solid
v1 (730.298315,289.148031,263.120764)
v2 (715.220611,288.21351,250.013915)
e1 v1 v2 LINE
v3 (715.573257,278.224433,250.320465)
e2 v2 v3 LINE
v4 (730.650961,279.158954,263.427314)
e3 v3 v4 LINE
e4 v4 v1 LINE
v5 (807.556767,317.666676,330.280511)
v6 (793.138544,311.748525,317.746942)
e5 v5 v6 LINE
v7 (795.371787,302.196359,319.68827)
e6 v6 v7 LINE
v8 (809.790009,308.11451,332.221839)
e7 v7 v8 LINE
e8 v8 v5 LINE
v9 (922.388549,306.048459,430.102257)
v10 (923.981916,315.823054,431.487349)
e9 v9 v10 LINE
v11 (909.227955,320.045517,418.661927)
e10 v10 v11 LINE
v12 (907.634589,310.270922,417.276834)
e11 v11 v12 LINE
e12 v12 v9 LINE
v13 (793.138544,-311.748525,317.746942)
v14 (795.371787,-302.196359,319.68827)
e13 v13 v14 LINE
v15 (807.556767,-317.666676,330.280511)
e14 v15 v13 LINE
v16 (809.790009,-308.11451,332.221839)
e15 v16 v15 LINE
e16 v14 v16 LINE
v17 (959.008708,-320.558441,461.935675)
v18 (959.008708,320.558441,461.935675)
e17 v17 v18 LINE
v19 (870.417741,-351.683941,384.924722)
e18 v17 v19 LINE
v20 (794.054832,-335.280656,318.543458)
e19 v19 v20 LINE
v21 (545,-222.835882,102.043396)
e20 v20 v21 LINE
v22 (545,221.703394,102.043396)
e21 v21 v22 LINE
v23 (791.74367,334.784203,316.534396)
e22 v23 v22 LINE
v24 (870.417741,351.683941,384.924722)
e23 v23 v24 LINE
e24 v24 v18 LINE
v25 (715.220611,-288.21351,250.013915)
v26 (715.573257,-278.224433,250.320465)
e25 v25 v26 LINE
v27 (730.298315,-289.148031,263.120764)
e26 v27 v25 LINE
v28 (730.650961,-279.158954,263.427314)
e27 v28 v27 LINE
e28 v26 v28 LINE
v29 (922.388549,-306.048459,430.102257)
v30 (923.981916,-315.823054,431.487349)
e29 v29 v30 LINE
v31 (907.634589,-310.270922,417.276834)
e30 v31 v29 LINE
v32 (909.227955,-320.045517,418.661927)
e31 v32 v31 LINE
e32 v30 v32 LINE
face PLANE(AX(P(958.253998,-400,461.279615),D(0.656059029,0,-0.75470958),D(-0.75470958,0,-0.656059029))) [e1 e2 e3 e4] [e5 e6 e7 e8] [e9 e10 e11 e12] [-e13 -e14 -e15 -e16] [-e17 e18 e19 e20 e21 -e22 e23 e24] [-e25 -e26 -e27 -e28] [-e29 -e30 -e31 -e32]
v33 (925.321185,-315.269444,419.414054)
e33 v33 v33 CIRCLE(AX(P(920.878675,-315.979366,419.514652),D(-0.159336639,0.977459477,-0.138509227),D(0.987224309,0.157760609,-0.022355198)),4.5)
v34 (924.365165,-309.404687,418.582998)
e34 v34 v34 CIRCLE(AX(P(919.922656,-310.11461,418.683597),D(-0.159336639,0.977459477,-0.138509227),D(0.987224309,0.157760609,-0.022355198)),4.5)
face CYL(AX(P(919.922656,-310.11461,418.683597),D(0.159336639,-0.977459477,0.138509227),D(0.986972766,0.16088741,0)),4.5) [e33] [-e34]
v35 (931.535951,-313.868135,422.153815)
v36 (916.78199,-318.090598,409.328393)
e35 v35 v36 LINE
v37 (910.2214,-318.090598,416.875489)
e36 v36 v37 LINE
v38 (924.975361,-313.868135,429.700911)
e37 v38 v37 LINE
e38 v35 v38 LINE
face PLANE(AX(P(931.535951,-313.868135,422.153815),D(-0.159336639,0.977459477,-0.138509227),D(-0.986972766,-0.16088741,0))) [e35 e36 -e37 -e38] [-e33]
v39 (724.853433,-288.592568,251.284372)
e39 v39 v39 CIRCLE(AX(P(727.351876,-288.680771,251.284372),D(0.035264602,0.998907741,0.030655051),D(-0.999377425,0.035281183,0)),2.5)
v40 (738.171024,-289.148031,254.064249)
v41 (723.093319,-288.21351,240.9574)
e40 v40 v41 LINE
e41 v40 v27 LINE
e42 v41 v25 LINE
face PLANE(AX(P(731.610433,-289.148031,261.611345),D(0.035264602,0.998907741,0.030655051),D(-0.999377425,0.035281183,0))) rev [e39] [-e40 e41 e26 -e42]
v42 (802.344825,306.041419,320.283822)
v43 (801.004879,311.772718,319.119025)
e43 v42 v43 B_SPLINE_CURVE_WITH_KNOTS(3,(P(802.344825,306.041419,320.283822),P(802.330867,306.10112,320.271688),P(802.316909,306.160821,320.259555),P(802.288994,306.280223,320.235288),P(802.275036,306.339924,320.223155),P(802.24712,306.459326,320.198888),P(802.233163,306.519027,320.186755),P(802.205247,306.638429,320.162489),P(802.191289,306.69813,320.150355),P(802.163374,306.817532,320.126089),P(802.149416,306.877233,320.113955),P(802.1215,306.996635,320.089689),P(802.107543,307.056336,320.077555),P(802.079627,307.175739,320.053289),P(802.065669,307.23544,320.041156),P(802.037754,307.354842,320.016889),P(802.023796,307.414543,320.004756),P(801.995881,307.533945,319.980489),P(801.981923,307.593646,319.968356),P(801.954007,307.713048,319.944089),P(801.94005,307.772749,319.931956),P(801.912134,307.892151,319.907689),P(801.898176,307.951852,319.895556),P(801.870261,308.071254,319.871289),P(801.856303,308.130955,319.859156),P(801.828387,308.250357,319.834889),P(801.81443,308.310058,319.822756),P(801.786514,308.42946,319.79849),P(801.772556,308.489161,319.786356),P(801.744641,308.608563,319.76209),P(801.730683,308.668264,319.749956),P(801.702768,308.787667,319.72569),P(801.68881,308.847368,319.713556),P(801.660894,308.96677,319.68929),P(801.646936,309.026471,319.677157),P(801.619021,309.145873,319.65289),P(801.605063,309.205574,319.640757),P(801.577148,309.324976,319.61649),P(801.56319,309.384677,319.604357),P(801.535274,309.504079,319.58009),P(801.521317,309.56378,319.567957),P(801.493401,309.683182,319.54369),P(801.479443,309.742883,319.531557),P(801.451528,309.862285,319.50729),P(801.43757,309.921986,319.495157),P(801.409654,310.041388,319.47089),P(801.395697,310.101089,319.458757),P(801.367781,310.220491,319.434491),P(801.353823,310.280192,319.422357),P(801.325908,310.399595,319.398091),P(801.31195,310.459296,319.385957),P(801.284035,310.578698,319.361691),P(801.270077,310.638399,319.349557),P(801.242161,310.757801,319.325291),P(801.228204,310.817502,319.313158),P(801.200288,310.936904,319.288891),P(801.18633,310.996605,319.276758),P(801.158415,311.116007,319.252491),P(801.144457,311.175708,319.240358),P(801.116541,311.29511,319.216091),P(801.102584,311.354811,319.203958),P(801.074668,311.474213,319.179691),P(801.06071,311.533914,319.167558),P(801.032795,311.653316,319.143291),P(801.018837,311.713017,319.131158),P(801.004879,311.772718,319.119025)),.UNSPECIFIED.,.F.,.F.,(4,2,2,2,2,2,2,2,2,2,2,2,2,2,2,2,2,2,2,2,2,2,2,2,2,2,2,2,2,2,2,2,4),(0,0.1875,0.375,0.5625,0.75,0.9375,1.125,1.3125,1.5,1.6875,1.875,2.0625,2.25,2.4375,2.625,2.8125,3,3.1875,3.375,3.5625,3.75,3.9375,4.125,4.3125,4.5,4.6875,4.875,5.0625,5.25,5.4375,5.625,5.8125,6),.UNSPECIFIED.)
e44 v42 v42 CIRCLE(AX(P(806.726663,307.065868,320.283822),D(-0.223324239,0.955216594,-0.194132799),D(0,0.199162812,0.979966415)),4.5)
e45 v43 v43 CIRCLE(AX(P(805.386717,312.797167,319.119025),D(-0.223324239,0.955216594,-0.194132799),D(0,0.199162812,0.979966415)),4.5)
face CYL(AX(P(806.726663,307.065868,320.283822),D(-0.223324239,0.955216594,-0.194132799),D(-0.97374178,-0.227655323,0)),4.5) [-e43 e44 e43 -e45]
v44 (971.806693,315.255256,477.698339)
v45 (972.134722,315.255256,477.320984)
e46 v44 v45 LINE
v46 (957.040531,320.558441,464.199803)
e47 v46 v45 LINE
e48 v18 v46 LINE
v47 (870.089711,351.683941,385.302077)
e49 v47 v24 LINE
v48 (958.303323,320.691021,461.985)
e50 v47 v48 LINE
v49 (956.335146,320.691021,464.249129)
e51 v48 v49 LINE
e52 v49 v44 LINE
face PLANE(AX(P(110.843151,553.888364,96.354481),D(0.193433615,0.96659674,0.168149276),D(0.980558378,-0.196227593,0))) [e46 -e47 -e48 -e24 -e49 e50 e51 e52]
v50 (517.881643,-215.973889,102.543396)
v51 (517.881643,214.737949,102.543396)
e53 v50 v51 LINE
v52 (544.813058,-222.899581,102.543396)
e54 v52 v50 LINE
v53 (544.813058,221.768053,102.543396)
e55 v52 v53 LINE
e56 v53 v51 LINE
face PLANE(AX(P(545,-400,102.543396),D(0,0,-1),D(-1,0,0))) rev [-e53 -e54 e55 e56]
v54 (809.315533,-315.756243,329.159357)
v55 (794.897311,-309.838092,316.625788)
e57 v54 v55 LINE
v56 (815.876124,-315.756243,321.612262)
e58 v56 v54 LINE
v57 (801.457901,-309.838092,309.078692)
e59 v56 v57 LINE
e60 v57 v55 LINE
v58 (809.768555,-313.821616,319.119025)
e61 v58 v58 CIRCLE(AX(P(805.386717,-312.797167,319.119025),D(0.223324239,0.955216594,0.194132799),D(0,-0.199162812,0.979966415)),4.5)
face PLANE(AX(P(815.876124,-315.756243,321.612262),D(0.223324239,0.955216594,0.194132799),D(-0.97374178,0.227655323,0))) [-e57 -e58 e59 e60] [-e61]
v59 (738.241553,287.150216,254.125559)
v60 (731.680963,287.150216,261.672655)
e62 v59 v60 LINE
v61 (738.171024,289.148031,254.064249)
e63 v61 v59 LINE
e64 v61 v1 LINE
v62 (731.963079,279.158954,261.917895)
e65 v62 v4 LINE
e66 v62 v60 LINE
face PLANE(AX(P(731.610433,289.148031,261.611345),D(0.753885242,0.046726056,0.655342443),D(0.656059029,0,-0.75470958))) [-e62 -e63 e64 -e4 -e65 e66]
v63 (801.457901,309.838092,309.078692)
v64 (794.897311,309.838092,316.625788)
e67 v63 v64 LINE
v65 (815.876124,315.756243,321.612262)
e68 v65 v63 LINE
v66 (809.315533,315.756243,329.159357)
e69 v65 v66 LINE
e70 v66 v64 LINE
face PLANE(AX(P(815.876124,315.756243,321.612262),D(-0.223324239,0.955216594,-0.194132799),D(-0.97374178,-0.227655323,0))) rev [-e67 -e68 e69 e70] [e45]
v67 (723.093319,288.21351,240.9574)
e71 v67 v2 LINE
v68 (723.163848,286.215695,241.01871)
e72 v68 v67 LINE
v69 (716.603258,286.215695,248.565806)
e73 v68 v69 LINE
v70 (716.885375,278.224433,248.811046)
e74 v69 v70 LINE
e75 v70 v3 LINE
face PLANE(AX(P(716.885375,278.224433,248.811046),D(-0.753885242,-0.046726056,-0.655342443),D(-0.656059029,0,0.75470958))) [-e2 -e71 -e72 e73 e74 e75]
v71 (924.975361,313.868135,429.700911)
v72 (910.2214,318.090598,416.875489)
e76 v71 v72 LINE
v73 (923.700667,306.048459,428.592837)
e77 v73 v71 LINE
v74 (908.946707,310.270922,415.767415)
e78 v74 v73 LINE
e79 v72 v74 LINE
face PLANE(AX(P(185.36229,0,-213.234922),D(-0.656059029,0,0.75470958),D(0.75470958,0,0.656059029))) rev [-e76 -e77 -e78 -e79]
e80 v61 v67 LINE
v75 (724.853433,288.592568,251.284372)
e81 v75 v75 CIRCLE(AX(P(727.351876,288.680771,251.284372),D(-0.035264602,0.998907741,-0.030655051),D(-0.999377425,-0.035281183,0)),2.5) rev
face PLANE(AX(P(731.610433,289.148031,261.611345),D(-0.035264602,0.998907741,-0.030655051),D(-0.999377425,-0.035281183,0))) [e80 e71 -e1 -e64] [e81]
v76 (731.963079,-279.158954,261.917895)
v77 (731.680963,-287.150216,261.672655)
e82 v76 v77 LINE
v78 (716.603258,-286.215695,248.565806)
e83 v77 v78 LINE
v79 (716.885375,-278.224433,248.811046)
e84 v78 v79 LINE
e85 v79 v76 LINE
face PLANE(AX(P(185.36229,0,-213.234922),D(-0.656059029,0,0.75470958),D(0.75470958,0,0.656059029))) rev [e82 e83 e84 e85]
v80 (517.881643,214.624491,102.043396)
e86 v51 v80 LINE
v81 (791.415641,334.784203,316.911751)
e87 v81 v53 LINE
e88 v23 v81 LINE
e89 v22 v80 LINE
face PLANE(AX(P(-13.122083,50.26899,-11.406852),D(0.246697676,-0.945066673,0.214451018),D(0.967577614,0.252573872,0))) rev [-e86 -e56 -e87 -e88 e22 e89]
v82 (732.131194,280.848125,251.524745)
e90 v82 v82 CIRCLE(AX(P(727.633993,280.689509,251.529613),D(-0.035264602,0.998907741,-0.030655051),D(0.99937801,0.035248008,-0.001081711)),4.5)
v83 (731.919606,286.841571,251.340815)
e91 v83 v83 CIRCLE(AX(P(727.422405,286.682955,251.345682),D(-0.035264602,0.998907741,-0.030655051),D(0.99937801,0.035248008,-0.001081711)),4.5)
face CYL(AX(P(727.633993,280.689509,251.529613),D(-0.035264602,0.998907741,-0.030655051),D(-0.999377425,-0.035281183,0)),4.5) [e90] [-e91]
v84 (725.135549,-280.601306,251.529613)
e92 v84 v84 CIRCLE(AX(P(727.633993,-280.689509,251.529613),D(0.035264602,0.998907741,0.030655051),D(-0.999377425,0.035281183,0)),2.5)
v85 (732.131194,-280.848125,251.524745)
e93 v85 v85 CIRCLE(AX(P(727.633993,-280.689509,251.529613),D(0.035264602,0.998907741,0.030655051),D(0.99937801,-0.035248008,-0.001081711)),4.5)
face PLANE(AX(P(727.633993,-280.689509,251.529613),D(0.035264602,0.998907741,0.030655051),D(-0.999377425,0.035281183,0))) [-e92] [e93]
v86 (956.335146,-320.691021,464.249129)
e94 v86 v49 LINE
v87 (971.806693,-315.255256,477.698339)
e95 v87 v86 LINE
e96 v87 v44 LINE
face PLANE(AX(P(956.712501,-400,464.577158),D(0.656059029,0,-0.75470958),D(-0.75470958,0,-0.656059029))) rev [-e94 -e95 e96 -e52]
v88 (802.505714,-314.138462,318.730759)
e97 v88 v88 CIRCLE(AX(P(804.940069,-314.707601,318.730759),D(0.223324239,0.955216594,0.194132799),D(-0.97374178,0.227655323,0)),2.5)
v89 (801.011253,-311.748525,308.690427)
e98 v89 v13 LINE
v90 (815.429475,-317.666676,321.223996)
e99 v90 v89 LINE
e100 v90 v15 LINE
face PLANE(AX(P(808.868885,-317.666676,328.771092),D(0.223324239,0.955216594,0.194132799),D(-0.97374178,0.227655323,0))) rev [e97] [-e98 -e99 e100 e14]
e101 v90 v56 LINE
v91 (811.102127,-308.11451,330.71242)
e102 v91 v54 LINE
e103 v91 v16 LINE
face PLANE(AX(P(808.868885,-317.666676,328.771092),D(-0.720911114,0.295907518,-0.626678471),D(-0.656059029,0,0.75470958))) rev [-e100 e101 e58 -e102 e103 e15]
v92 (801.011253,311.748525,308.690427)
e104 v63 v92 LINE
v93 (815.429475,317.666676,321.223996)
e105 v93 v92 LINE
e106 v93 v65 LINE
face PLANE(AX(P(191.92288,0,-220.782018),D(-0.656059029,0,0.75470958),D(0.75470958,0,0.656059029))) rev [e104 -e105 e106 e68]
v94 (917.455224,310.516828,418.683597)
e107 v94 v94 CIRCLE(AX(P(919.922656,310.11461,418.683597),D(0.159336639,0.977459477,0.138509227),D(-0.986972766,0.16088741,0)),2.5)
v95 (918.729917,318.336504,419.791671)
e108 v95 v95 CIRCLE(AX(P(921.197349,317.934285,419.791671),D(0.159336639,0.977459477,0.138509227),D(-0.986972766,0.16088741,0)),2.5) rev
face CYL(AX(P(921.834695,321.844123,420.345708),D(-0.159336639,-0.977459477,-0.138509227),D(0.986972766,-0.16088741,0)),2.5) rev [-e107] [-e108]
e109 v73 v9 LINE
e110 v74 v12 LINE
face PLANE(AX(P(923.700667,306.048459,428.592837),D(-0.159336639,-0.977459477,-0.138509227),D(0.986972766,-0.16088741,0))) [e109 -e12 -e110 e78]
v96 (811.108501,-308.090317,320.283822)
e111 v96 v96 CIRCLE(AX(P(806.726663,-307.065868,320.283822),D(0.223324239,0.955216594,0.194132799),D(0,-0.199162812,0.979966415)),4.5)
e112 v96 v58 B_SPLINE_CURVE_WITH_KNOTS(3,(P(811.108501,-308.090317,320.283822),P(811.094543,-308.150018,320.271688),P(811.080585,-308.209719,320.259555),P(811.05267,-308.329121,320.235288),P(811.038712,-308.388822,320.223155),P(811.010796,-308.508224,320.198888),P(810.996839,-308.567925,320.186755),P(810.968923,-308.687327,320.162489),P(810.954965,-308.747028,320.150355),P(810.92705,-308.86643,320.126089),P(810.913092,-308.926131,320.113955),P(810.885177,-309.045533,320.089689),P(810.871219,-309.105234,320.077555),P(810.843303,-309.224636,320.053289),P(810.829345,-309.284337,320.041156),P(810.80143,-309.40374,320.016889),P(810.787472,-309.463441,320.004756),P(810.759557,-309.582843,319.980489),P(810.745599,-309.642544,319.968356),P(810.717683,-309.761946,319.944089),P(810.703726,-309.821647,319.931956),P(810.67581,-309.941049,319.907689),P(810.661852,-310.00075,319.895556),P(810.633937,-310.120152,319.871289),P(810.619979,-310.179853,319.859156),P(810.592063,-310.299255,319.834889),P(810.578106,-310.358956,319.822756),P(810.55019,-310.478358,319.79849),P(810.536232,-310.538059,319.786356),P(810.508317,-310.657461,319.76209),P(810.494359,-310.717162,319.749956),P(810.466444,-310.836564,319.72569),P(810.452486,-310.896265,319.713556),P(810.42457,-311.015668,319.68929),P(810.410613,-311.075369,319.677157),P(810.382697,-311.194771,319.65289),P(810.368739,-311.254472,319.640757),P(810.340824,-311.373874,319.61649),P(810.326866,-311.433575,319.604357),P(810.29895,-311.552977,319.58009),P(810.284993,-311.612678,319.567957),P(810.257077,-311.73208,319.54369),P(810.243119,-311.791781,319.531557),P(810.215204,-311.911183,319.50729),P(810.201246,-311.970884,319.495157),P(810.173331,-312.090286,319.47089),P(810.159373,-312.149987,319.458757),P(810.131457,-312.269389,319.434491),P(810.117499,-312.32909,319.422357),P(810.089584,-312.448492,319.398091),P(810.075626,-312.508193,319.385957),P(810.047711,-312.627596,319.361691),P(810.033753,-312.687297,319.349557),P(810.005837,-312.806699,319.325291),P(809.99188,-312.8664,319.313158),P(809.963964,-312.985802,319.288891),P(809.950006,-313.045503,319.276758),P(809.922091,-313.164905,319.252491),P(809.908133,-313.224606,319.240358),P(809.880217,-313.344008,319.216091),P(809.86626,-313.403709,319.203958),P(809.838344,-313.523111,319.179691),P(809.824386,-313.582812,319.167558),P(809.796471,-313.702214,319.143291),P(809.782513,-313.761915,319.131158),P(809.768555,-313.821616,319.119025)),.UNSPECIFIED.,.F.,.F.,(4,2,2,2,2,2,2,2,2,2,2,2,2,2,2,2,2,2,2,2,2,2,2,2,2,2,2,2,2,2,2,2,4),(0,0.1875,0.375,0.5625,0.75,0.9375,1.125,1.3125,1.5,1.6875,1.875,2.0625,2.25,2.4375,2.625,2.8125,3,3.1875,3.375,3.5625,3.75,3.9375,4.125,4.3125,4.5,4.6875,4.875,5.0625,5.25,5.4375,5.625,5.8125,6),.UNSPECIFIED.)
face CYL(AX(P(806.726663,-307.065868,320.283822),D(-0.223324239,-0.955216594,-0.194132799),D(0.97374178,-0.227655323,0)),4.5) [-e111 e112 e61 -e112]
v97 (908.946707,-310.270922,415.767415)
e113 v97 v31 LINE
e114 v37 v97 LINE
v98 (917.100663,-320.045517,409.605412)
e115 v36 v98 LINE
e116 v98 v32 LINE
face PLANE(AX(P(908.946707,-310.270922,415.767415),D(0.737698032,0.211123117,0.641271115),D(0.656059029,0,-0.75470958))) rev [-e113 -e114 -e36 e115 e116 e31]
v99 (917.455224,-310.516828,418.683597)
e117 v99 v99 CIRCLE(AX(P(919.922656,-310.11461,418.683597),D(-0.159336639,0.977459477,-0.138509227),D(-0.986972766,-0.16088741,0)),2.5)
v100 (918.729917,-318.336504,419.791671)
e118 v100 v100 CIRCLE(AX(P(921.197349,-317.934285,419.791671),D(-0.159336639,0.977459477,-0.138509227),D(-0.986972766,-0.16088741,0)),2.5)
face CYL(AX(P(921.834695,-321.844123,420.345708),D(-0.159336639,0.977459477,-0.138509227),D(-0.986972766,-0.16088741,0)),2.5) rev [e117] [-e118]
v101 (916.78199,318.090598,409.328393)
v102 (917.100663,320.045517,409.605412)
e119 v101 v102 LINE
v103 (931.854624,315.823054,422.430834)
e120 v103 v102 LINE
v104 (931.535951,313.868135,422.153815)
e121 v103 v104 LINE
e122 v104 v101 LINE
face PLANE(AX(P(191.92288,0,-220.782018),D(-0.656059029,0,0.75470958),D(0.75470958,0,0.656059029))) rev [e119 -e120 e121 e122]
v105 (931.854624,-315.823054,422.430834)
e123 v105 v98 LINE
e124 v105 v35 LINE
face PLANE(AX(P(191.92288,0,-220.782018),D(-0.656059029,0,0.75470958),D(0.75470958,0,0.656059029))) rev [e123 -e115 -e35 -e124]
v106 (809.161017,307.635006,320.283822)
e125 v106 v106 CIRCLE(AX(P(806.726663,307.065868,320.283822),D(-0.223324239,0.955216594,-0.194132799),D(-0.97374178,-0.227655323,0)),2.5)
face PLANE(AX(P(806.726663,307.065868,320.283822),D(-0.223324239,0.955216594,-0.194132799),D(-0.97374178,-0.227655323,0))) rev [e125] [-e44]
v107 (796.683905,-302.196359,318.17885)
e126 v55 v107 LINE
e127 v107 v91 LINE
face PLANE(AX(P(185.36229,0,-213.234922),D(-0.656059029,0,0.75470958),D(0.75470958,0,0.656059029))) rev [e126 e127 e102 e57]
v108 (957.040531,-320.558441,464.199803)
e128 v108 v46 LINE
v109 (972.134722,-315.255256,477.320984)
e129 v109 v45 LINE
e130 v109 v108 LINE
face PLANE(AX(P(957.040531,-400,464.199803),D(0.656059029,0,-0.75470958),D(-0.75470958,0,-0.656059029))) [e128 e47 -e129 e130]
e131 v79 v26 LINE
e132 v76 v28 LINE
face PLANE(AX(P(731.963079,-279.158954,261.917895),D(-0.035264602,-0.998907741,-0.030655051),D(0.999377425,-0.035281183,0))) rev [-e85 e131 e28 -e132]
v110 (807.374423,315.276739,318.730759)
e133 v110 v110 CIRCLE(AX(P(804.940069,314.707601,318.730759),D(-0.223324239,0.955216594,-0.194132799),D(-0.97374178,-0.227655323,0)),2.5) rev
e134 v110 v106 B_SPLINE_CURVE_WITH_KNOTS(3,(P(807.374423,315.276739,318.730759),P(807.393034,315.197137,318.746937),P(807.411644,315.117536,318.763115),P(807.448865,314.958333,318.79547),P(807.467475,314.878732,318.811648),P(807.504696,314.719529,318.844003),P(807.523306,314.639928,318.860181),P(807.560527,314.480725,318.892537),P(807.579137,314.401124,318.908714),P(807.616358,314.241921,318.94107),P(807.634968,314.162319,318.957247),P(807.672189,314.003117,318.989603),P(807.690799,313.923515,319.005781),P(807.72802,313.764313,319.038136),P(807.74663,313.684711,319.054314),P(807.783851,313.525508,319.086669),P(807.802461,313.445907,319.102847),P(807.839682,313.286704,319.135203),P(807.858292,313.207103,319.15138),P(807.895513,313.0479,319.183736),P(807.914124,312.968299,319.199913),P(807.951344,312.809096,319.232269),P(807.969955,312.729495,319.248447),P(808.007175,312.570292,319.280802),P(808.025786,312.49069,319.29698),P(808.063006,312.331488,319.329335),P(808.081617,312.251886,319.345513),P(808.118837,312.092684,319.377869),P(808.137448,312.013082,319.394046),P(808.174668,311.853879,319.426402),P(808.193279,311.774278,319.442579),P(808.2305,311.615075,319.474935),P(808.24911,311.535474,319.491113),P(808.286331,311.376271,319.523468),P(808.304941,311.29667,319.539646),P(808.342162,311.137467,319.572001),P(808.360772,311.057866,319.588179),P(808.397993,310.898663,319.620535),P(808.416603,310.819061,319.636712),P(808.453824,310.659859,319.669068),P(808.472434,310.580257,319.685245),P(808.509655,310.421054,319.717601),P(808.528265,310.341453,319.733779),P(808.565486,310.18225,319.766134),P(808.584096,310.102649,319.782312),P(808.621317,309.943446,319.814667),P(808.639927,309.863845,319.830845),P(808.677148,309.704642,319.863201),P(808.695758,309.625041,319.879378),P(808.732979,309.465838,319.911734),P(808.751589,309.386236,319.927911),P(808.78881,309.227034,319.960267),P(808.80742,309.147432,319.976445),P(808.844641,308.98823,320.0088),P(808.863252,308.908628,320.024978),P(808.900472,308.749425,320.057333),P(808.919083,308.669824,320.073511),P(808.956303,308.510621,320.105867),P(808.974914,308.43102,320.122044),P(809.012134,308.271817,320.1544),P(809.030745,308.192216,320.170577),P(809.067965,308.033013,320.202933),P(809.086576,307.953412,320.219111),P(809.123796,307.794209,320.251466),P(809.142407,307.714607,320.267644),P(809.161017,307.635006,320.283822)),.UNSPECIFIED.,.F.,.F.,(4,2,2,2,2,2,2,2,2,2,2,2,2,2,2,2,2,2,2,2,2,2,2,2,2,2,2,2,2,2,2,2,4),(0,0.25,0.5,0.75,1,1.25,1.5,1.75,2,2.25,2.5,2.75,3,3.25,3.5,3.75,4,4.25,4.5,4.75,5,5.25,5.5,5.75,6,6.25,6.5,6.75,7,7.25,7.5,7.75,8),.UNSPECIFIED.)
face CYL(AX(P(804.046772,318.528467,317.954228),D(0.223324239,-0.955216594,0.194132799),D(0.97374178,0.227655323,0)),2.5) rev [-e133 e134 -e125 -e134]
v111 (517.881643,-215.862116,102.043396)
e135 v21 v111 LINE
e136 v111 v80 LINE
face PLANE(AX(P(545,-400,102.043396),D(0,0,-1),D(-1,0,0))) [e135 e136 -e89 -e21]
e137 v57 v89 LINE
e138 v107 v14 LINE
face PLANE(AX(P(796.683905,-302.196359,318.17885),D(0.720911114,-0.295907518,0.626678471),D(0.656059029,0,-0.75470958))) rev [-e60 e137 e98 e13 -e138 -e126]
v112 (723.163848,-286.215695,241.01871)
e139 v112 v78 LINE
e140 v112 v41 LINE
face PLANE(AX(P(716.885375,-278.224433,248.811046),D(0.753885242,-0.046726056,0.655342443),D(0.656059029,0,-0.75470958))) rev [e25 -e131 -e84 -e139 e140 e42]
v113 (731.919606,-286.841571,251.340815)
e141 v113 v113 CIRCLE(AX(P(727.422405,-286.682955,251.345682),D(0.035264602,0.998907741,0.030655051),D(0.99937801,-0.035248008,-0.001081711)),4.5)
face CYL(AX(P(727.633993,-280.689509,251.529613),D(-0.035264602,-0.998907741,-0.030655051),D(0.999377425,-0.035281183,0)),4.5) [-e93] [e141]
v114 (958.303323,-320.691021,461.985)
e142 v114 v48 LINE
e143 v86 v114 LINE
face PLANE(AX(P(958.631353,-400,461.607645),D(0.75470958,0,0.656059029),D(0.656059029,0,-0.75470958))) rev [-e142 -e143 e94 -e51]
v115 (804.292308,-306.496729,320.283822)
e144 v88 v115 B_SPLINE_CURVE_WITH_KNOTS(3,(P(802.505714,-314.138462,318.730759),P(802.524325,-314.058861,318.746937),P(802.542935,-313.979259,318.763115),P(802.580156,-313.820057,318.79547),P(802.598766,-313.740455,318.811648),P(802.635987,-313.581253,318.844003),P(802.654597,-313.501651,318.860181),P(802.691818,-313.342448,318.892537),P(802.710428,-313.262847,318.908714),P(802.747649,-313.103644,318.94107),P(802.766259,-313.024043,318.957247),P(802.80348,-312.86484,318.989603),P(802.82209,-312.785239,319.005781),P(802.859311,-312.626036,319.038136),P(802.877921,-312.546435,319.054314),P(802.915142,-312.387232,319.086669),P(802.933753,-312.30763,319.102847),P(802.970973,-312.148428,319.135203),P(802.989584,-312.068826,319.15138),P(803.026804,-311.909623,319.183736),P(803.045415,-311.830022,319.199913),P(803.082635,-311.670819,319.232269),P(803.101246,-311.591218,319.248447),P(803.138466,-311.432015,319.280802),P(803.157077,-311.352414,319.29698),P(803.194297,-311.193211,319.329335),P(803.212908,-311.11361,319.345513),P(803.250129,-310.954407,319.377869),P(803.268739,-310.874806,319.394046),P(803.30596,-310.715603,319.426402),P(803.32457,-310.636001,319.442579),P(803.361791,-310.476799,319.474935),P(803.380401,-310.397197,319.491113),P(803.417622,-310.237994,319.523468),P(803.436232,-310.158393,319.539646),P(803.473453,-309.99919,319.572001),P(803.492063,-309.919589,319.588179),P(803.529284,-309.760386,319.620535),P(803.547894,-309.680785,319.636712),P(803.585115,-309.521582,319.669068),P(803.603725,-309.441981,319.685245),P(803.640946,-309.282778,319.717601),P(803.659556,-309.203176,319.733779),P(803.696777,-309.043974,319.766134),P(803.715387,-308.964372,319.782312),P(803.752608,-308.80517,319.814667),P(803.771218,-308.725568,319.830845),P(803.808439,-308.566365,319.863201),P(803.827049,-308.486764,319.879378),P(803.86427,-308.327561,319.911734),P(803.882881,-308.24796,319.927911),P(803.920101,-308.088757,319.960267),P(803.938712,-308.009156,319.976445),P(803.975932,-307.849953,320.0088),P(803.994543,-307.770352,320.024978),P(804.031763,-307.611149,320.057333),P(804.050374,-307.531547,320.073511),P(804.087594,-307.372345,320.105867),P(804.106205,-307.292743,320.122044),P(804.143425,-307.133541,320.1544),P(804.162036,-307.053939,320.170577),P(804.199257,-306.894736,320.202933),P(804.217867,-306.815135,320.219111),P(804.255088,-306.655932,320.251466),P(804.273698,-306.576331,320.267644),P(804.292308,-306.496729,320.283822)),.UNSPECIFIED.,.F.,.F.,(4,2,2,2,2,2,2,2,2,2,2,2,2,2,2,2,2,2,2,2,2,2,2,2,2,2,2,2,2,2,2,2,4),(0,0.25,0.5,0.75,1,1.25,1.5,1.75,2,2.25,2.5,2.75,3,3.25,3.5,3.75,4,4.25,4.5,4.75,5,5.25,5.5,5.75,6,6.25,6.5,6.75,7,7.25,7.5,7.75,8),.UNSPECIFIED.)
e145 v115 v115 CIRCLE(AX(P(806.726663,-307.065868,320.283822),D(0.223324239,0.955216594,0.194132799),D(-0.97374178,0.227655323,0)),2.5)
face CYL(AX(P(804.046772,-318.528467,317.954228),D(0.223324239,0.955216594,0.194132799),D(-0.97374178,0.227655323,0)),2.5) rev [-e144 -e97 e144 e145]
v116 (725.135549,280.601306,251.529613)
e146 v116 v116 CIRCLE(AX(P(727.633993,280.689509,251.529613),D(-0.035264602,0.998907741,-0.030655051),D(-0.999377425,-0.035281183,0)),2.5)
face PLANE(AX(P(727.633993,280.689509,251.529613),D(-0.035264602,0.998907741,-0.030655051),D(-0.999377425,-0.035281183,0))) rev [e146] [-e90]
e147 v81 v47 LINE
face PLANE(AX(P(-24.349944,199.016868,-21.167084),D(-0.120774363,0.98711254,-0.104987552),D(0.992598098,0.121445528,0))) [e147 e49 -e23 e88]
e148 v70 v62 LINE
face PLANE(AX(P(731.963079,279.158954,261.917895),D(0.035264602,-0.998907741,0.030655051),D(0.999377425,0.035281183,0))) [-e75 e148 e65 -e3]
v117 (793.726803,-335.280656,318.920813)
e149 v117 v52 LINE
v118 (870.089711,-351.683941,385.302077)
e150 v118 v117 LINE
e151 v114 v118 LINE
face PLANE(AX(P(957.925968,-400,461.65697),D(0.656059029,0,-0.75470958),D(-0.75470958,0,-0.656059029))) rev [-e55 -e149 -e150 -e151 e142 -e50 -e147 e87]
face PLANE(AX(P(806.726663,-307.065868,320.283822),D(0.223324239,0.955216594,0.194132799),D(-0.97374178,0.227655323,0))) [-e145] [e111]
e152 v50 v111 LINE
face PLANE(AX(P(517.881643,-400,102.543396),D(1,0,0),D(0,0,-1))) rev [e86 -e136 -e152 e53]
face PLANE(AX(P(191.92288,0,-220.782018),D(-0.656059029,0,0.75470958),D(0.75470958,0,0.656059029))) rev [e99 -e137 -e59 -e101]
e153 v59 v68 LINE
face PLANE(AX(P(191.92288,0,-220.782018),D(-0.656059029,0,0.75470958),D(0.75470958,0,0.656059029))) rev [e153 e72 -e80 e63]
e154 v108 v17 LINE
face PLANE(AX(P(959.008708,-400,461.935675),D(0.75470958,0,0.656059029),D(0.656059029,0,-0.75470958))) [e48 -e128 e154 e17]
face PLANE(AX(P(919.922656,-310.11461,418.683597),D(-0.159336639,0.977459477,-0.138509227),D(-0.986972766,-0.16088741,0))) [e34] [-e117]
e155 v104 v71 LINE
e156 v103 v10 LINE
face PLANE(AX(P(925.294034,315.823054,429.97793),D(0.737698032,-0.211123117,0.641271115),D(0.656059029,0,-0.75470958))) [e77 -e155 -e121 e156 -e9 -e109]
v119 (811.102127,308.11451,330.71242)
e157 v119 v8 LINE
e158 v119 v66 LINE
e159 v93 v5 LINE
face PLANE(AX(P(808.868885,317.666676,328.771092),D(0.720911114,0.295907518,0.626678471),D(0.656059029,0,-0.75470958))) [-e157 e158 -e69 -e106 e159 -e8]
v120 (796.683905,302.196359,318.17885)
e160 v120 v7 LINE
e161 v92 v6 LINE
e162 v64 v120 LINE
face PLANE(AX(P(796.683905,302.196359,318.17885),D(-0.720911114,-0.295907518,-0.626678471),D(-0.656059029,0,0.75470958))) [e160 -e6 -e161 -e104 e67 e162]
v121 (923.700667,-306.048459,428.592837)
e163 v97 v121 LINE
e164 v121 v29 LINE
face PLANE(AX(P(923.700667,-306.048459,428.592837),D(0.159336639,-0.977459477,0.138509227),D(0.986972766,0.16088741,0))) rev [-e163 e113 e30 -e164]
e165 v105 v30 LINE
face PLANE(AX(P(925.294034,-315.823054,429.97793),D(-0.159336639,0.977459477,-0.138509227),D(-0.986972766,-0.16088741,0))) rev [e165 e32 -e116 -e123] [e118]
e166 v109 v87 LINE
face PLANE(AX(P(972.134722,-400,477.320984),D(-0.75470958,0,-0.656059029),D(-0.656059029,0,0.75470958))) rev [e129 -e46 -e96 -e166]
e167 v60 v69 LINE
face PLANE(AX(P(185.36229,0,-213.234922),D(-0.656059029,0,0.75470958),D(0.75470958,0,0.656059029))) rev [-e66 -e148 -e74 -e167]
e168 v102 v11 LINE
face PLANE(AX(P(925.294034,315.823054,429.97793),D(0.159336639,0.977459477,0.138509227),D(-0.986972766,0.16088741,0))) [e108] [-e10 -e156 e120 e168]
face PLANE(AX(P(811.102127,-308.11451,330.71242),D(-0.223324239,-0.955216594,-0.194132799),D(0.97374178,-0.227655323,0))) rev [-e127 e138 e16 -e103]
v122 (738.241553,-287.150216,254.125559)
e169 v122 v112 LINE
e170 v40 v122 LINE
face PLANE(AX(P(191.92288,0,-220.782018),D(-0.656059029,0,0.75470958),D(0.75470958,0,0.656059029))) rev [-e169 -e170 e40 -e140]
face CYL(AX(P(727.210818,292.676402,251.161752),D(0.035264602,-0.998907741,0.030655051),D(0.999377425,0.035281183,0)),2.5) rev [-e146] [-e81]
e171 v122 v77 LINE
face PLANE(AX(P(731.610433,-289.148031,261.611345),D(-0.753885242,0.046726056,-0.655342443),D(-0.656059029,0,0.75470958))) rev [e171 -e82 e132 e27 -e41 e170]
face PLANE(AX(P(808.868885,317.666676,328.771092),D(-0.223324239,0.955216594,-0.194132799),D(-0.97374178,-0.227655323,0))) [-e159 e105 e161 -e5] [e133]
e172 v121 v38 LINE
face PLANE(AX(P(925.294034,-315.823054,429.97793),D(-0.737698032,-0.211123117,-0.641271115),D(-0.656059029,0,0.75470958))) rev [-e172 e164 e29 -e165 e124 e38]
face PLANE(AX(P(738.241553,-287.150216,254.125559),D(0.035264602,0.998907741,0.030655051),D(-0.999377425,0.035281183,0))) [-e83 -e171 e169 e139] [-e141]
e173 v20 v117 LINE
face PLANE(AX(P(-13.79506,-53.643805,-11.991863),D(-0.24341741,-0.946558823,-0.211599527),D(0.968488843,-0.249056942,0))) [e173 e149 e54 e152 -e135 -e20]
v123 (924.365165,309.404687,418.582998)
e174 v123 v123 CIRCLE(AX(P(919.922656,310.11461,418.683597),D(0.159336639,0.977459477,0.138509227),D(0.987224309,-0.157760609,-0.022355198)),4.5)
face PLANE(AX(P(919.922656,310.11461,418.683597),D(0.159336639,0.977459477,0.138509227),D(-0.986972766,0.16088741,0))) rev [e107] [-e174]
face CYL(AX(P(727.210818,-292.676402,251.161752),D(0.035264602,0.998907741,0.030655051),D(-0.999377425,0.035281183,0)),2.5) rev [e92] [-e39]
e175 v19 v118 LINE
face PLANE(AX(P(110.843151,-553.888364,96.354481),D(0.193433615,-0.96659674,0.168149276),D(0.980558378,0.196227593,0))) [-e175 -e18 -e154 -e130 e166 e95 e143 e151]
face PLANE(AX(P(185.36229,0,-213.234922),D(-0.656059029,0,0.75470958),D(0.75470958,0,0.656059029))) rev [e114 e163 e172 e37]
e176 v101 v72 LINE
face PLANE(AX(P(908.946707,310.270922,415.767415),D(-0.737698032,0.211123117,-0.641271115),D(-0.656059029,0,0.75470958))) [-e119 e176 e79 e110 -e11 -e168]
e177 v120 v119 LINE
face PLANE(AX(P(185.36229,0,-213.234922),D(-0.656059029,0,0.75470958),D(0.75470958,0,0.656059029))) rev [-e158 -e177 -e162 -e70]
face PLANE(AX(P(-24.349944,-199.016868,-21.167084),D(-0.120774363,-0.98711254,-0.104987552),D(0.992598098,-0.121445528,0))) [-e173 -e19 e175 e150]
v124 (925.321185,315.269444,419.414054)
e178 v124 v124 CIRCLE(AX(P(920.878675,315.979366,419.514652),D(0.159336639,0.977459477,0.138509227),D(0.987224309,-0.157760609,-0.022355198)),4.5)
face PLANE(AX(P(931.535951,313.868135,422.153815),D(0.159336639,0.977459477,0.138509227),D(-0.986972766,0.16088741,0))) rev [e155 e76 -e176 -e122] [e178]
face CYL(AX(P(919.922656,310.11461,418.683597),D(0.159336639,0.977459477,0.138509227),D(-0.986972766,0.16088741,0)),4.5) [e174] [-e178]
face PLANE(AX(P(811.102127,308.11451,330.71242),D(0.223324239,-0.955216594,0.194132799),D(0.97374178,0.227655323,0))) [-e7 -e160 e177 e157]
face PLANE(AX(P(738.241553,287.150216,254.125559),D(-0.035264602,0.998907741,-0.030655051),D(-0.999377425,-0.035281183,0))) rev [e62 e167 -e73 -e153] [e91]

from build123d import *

# Parameters (mm, degrees)
WYCI_GNI_CIE_CIENKA_CIANKA1_DEPTH      = 400
WYCI_GNI_CIE_CIENKA_CIANKA1_DEPTH_BACK = 400
LUSTRO2_START                          = 277.039042492
LUSTRO2_DEPTH                          = 3.5
DODANIE_WYCI_GNI_CIE1_DEPTH            = 2
WYCI_GNI_CIE_CIENKA_CIANKA2_DEPTH      = 10
SZKIC12_R                              = 2.5
WYTNIJ_WYCI_GNI_CIE1_DEPTH             = 6
DODANIE_WYCI_GNI_CIE2_DEPTH            = 2
WYCI_GNI_CIE_CIENKA_CIANKA3_DEPTH      = 10
SZKIC16_R                              = 2.5
WYTNIJ_WYCI_GNI_CIE2_DEPTH             = 6
DODANIE_WYCI_GNI_CIE3_DEPTH            = 2
WYCI_GNI_CIE_CIENKA_CIANKA4_DEPTH      = 10
SZKIC19_R                              = 2.5
WYTNIJ_WYCI_GNI_CIE3_DEPTH             = 6
EXTRUDE_THIN1_START                    = 6
SZKIC19_2_R                            = 4.5
SZKIC19_2_R_2                          = 2.5
EXTRUDE_THIN1_DEPTH                    = 6
EXTRUDE_THIN2_START                    = 6
SZKIC16_2_R                            = 4.5
SZKIC16_2_R_2                          = 2.5
EXTRUDE_THIN2_DEPTH                    = 6
EXTRUDE_THIN3_START                    = 6
SZKIC12_2_R                            = 4.5
SZKIC12_2_R_2                          = 2.5
EXTRUDE_THIN3_DEPTH                    = 6


# Read off the part's stored shape, not the designer's step: Lustro2
with BuildPart() as part:
    # Szkic1 → Wyciągnięcie-cienka ścianka1 (new, two sides: drawn at the far end of the back side and taken through both)
    with BuildSketch(Plane(origin=(0, 0, 0), x_dir=(1, 0, 0), z_dir=(0, 1, 0)).offset(-WYCI_GNI_CIE_CIENKA_CIANKA1_DEPTH_BACK)):
        Polygon((972.134722106, -477.320983834), (957.040530502, -464.199803255), (959.008707589, -461.935674514), (958.253998008, -461.279615485), (545, -102.043395667), (517.881642578, -102.043395667), (517.881642578, -102.543395667), (544.81305766, -102.543395667), (957.925968494, -461.656970275), (958.303323284, -461.98499979), (956.335146197, -464.24912853), (971.806692592, -477.698338624), align=None)
    extrude(amount=WYCI_GNI_CIE_CIENKA_CIANKA1_DEPTH + WYCI_GNI_CIE_CIENKA_CIANKA1_DEPTH_BACK)

    # Cięcie powierzchnią2
    split(bisect_by=Plane(origin=(-13.122082675, 50.268990001, -11.406852442), x_dir=(0.6328754019355285, 0.32469887066665293, 0.7028793417171568), z_dir=(0.24669767629086262, -0.945066673459785, 0.21445101824972695)), keep=Keep.TOP)

    # Cięcie powierzchnią3
    split(bisect_by=Plane(origin=(-13.795060398, -53.64380516, -11.991863051), x_dir=(-0.7143770117085512, 0.3225312314146349, -0.6209984620790296), z_dir=(-0.24341741026967303, -0.9465588226635253, -0.21159952650099761)), keep=Keep.BOTTOM)

    # Cięcie powierzchnią4
    split(bisect_by=Plane(origin=(-24.349944471, -199.016868, -21.167083796), x_dir=(0.7449832908348125, -0.1600276007809854, 0.6476040946173941), z_dir=(-0.12077436340947467, -0.987112540183885, -0.10498755238005406)), keep=Keep.BOTTOM)

    # Cięcie powierzchnią5
    split(bisect_by=Plane(origin=(110.843151094, -553.888363867, 96.354481224), x_dir=(0.7294998198065532, 0.25630205312360615, 0.6341445185971655), z_dir=(0.19343361492315114, -0.9665967398893007, 0.1681492761005468)), keep=Keep.BOTTOM)

    # Lustro2 outline → Lustro2 (cut)
    with BuildSketch(Plane(origin=(0, 0, 0), x_dir=(0.754709580222771, 0, 0.6560590289905086), z_dir=(0.6560590289905085, 0, -0.754709580222771)).offset(LUSTRO2_START)):
        Polygon((909.445947287, -351.683941116), (805.20178126, -334.784202631), (993.753311489, -400), (1046.830129212, -400), (1046.830129212, -315.255256391), align=None)
    extrude(amount=LUSTRO2_DEPTH, mode=Mode.SUBTRACT)

    # Szkic10 → Dodanie-wyciągnięcie1 (add)
    with BuildSketch(Plane(origin=(184.050171811, 0, -211.725502995), x_dir=(-0.7547095802227711, 0, -0.6560590289905084), z_dir=(0.6560590289905084, 0, -0.7547095802227711))):
        Polygon((-723.785887875, -289.14803149), (-703.807733048, -288.213510375), (-704.274993606, -278.224432962), (-724.253148432, -279.158954077), align=None)
    dodanie_wyci_gni_cie1 = extrude(amount=DODANIE_WYCI_GNI_CIE1_DEPTH)

    # Szkic11 → Wyciągnięcie-cienka ścianka2 (add)
    with BuildSketch(Plane(origin=(185.362289869, 0, -213.234922155), x_dir=(-0.7547095802227721, 0, -0.6560590289905072), z_dir=(0.6560590289905072, 0, -0.7547095802227721))):
        Polygon((-723.785887875, -289.14803149), (-703.807733048, -288.213510375), (-703.901185159, -286.215694893), (-723.879339986, -287.150216008), align=None)
    wyci_gni_cie_cienka_cianka2 = extrude(amount=WYCI_GNI_CIE_CIENKA_CIANKA2_DEPTH)

    # Szkic12 → Wytnij-wyciągnięcie1 (cut)
    with BuildSketch(Plane(origin=(-8.922386764, -252.736192146, -7.756112483), x_dir=(0.9993780104898576, -0.03524800775504095, -0.0010817109755482265), z_dir=(0.035264601930747055, 0.9989077413419046, 0.030655050772765847))):
        with Locations(Location((736.803075954, -260.021158903, 0), (0, 0, 179.937993373))):
            Circle(SZKIC12_R)
    wytnij_wyci_gni_cie1 = extrude(amount=-WYTNIJ_WYCI_GNI_CIE1_DEPTH, mode=Mode.SUBTRACT)

    # Szkic14 → Dodanie-wyciągnięcie2 (add)
    with BuildSketch(Plane(origin=(184.050171811, 0, -211.725502995), x_dir=(-0.7547095802227711, 0, -0.6560590289905084), z_dir=(0.6560590289905084, 0, -0.7547095802227711))):
        Polygon((-826.154339771, -317.666675693), (-807.050007897, -311.748525334), (-810.009083077, -302.196359397), (-829.11341495, -308.114509757), align=None)
    dodanie_wyci_gni_cie2 = extrude(amount=DODANIE_WYCI_GNI_CIE2_DEPTH)

    # Szkic15 → Wyciągnięcie-cienka ścianka3 (add)
    with BuildSketch(Plane(origin=(185.362289869, 0, -213.234922155), x_dir=(-0.7547095802227656, 8.492898931658996e-15, -0.6560590289905148), z_dir=(0.6560590289905147, 9.769962616701384e-15, -0.7547095802227655))):
        Polygon((-826.154339771, -317.666675693), (-807.050007897, -311.748525334), (-807.641822933, -309.838092146), (-826.746154807, -315.756242506), align=None)
    wyci_gni_cie_cienka_cianka3 = extrude(amount=WYCI_GNI_CIE_CIENKA_CIANKA3_DEPTH)

    # Szkic16 → Wytnij-wyciągnięcie2 (cut)
    with BuildSketch(Plane(origin=(-12.723943102, -54.423656206, -11.060754992), x_dir=(0.9747442148680406, -0.21885025353139564, -0.04447788338636554), z_dir=(0.22332423867840068, 0.9552165936601662, 0.1941327989160557))):
        with Locations(Location((839.308044037, -375.023490092, 0), (0, 0, 177.401291281))):
            Circle(SZKIC16_R)
    wytnij_wyci_gni_cie2 = extrude(amount=-WYTNIJ_WYCI_GNI_CIE2_DEPTH, mode=Mode.SUBTRACT)

    # Szkic17 → Dodanie-wyciągnięcie3 (add)
    with BuildSketch(Plane(origin=(184.050171811, 0, -211.725502995), x_dir=(-0.7547095802227711, 0, -0.6560590289905084), z_dir=(0.6560590289905084, 0, -0.7547095802227711))):
        Polygon((-980.419174897, -315.823054253), (-960.869985355, -320.045516598), (-958.758754182, -310.270921827), (-978.307943724, -306.048459483), align=None)
    dodanie_wyci_gni_cie3 = extrude(amount=DODANIE_WYCI_GNI_CIE3_DEPTH)

    # Szkic18 → Wyciągnięcie-cienka ścianka4 (add)
    with BuildSketch(Plane(origin=(185.362289869, 0, -213.234922155), x_dir=(-0.7547095802227731, -3.9689825973234995e-15, -0.656059028990506), z_dir=(0.656059028990506, -4.565792188770957e-15, -0.7547095802227731))):
        Polygon((-980.419174897, -315.823054253), (-960.869985355, -320.045516598), (-960.44773912, -318.090597644), (-979.996928662, -313.868135299), align=None)
    wyci_gni_cie_cienka_cianka4 = extrude(amount=WYCI_GNI_CIE_CIENKA_CIANKA4_DEPTH)

    # Szkic19 → Wytnij-wyciągnięcie3 (cut)
    with BuildSketch(Plane(origin=(81.850178316, -502.114472254, 71.151274498), x_dir=(0.9872243085600819, 0.15776060888456483, -0.022355197884150288), z_dir=(-0.15933663918907087, 0.9774594770966201, -0.138509227295274))):
        with Locations(Location((849.886383223, -371.032714173, 0), (0, 0, 178.706565483))):
            Circle(SZKIC19_R)
    wytnij_wyci_gni_cie3 = extrude(amount=-WYTNIJ_WYCI_GNI_CIE3_DEPTH, mode=Mode.SUBTRACT)

    # Szkic19<2> → Extrude-Thin1 (add)
    with BuildSketch(Plane(origin=(81.850178316, -502.114472254, 71.151274498), x_dir=(0.9872243085600819, 0.15776060888456483, -0.022355197884150288), z_dir=(-0.15933663918907087, 0.9774594770966201, -0.138509227295274)).offset(EXTRUDE_THIN1_START)):
        with Locations((849.886383223, -371.032714173)):
            Circle(SZKIC19_2_R)
        with Locations((849.886383223, -371.032714173)):
            Circle(SZKIC19_2_R_2, mode=Mode.SUBTRACT)
    extrude_thin1 = extrude(amount=-EXTRUDE_THIN1_DEPTH)

    # Szkic16<2> → Extrude-Thin2 (add)
    with BuildSketch(Plane(origin=(-12.723943102, -54.423656206, -11.060754992), x_dir=(0.9747442148680406, -0.21885025353139564, -0.04447788338636554), z_dir=(0.22332423867840068, 0.9552165936601662, 0.1941327989160557)).offset(EXTRUDE_THIN2_START)):
        with Locations((839.308044037, -375.023490092)):
            Circle(SZKIC16_2_R)
        with Locations((839.308044037, -375.023490092)):
            Circle(SZKIC16_2_R_2, mode=Mode.SUBTRACT)
    extrude_thin2 = extrude(amount=-EXTRUDE_THIN2_DEPTH)

    # Szkic12<2> → Extrude-Thin3 (add)
    with BuildSketch(Plane(origin=(-8.922386764, -252.736192146, -7.756112483), x_dir=(0.9993780104898576, -0.03524800775504095, -0.0010817109755482265), z_dir=(0.035264601930747055, 0.9989077413419046, 0.030655050772765847)).offset(EXTRUDE_THIN3_START)):
        with Locations((736.803075954, -260.021158903)):
            Circle(SZKIC12_2_R)
        with Locations((736.803075954, -260.021158903)):
            Circle(SZKIC12_2_R_2, mode=Mode.SUBTRACT)
    extrude_thin3 = extrude(amount=-EXTRUDE_THIN3_DEPTH)

    # Lustro3: Dodanie-wyciągnięcie1, Wyciągnięcie-cienka ścianka2, Wytnij-wyciągnięcie1, Dodanie-wyciągnięcie2, Wyciągnięcie-cienka ścianka3, Wytnij-wyciągnięcie2, Dodanie-wyciągnięcie3, Wyciągnięcie-cienka ścianka4, Wytnij-wyciągnięcie3, Extrude-Thin1, Extrude-Thin2, Extrude-Thin3 across plane
    add(dodanie_wyci_gni_cie1.mirror(Plane.ZX))
    add(wyci_gni_cie_cienka_cianka2.mirror(Plane.ZX))
    add(wytnij_wyci_gni_cie1.mirror(Plane.ZX), mode=Mode.SUBTRACT)
    add(dodanie_wyci_gni_cie2.mirror(Plane.ZX))
    add(wyci_gni_cie_cienka_cianka3.mirror(Plane.ZX))
    add(wytnij_wyci_gni_cie2.mirror(Plane.ZX), mode=Mode.SUBTRACT)
    add(dodanie_wyci_gni_cie3.mirror(Plane.ZX))
    add(wyci_gni_cie_cienka_cianka4.mirror(Plane.ZX))
    add(wytnij_wyci_gni_cie3.mirror(Plane.ZX), mode=Mode.SUBTRACT)
    add(extrude_thin1.mirror(Plane.ZX))
    add(extrude_thin2.mirror(Plane.ZX))
    add(extrude_thin3.mirror(Plane.ZX))


solid = part.part
